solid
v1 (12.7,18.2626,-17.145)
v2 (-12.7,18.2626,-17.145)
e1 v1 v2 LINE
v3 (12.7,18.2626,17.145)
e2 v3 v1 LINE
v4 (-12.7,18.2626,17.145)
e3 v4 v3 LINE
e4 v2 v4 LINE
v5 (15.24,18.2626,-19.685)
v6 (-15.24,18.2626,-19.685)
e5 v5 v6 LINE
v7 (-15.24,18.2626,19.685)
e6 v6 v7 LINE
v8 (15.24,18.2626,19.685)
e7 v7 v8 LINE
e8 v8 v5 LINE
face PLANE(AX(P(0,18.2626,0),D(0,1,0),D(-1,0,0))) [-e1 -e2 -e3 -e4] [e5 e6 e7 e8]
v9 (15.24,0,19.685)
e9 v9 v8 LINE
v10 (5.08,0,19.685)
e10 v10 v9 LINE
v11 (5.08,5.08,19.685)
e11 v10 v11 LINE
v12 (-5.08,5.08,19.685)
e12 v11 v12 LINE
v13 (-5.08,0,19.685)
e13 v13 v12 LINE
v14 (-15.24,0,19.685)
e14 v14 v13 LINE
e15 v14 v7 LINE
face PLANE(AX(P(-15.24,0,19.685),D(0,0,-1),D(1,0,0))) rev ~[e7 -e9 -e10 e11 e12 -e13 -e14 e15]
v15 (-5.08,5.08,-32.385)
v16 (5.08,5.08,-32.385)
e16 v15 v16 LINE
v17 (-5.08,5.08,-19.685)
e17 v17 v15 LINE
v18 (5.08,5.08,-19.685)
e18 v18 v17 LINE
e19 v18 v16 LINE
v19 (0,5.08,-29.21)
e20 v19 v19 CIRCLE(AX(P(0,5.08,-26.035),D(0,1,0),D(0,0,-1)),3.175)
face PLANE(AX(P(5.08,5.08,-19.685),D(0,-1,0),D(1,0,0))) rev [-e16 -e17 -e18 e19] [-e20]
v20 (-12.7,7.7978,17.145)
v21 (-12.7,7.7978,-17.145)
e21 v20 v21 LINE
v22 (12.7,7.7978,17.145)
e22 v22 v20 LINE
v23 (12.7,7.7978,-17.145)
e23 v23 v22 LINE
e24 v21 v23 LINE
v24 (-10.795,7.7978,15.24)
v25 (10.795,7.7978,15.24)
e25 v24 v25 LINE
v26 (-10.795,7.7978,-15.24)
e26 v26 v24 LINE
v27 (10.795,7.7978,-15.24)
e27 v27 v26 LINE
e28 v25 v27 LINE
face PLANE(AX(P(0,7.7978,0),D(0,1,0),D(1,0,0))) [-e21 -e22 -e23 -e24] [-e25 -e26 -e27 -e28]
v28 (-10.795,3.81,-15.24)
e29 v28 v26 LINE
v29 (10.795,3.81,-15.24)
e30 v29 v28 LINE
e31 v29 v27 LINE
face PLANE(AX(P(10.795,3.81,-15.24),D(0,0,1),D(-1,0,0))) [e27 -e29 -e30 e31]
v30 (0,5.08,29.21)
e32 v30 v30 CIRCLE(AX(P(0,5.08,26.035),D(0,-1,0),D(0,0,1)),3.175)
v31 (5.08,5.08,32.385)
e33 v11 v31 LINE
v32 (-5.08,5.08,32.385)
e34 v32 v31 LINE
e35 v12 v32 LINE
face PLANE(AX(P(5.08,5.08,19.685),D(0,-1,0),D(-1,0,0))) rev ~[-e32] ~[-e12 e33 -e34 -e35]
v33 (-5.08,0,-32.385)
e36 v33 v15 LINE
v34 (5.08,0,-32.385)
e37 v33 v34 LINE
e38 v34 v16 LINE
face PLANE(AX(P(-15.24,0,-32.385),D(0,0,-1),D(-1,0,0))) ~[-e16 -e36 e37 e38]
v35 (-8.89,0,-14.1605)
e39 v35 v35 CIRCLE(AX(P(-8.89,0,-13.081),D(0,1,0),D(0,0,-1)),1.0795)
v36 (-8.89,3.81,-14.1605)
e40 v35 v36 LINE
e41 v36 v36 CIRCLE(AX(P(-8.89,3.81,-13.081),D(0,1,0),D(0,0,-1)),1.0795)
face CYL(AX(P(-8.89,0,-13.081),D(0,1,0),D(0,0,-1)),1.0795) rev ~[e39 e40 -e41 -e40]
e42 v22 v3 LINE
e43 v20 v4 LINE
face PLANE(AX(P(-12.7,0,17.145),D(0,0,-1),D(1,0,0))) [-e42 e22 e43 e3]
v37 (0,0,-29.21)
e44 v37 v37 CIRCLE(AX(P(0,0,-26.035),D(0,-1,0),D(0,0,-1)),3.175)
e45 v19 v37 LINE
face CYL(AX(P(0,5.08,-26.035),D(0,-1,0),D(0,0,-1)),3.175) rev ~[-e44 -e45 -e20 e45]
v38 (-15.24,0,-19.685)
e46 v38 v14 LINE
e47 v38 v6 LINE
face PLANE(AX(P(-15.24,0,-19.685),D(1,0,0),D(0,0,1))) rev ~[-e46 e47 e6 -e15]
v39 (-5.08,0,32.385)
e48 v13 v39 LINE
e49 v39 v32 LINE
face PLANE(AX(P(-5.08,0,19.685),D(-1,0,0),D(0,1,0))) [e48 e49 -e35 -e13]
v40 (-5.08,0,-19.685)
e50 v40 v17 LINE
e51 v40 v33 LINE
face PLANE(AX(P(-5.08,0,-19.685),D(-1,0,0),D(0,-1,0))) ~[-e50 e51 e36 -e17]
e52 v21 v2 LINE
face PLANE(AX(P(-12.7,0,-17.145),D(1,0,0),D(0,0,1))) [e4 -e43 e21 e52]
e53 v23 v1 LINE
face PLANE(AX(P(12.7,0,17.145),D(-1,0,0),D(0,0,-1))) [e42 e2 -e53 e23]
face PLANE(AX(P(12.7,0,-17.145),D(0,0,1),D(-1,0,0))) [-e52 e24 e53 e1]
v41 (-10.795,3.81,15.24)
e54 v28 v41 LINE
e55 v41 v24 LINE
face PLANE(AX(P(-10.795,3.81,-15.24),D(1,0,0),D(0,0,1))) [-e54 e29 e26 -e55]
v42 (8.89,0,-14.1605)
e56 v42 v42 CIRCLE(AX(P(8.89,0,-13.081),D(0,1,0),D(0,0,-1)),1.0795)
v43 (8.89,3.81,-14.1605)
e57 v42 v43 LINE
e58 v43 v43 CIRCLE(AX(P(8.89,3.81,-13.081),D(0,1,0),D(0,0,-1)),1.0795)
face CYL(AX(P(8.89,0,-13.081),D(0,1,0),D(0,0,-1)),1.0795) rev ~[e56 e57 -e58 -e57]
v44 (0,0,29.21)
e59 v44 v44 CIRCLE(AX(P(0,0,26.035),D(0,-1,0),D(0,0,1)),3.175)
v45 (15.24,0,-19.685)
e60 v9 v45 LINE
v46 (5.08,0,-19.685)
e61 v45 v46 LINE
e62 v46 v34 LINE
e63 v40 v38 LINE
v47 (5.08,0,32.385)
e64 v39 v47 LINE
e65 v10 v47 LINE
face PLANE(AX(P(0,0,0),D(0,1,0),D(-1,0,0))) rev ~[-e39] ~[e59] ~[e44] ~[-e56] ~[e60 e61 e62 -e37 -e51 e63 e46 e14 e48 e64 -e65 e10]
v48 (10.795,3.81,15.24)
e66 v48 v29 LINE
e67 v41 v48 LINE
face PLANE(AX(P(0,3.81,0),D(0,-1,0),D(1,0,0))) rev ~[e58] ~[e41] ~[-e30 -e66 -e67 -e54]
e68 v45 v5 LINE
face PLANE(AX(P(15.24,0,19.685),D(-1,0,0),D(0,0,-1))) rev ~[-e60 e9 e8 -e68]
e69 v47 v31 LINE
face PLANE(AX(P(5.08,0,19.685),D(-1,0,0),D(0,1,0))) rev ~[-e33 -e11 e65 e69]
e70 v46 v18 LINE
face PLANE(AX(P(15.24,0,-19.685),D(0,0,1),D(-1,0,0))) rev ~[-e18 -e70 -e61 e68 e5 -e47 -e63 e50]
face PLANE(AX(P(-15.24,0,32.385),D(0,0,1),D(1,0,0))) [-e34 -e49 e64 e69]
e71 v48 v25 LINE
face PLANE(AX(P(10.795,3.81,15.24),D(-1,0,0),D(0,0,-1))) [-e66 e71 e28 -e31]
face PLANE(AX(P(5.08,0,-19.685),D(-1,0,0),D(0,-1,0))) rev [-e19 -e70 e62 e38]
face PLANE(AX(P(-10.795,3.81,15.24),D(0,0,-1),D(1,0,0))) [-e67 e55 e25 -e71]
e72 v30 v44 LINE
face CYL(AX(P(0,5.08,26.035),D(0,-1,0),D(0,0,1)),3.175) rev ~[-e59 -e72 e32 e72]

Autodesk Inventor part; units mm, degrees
ref_plane "XZ Plane" through (0, 0, 0) normal (0, 1, 0) x (-1, 0, 0)
sketch "Sketch3" plane through (0, 0, 0) normal (0, 1, 0) x (-1, 0, 0)
  line L0 (15.24, 19.685) -> (-15.24, 19.685)
  line L1 (-15.24, 19.685) -> (-15.24, -19.685)
  line L2 (-15.24, -19.685) -> (15.24, -19.685)
  line L3 (15.24, -19.685) -> (15.24, 19.685)
  line L4 (15.24, 19.685) -> (-15.24, -19.685) construction
  line L5 (-15.24, 19.685) -> (15.24, -19.685) construction
  line L6 (-12.7, 17.145) -> (-12.7, -17.145)
  line L7 (-12.7, -17.145) -> (12.7, -17.145)
  line L8 (12.7, -17.145) -> (12.7, 17.145)
  line L9 (12.7, 17.145) -> (-12.7, 17.145)
  line L10 (-12.7, 17.145) -> (12.7, -17.145) construction
  line L11 (-12.7, -17.145) -> (12.7, 17.145) construction
  point P0 (0, 0)
  dimension "d11" = 30.48
  dimension "d12" = 39.37
  dimension "d13" = 34.29
  dimension "d14" = 25.4
extrude "Extrusion4" add sketch "Sketch3" along normal blind 18.2626
sketch "Sketch4" plane through (0, 0, 0) normal (0, -1, 0) x (1, 0, 0)
  line L0 (12.7, 17.145) -> (-12.7, 17.145) projected
  line L1 (-12.7, -17.145) -> (12.7, -17.145) projected
  line L2 (12.7, 17.145) -> (-12.7, 17.145)
  line L3 (-12.7, 17.145) -> (-12.7, -17.145)
  line L4 (-12.7, -17.145) -> (12.7, -17.145)
  line L5 (12.7, -17.145) -> (12.7, 17.145)
  point P0 (0, 0)
extrude "Extrusion5" add sketch "Sketch4" against normal blind 3.81
sketch "Sketch5" plane through (0, 3.81, 0) normal (0, 1, 0) x (1, 0, 0)
  line L0 (10.795, -15.24) -> (10.795, 15.24)
  line L1 (10.795, 15.24) -> (-10.795, 15.24)
  line L2 (-10.795, 15.24) -> (-10.795, -15.24)
  line L3 (-10.795, -15.24) -> (10.795, -15.24)
  line L4 (10.795, -15.24) -> (-10.795, 15.24) construction
  line L5 (10.795, 15.24) -> (-10.795, -15.24) construction
  line L6 (12.7, -17.145) -> (-12.7, -17.145) projected
  line L7 (12.7, 17.145) -> (12.7, -17.145) projected
  line L8 (-12.7, 17.145) -> (12.7, 17.145) projected
  line L9 (12.7, -17.145) -> (-12.7, -17.145)
  line L10 (-12.7, -17.145) -> (-12.7, 17.145)
  line L11 (-12.7, 17.145) -> (12.7, 17.145)
  line L12 (12.7, 17.145) -> (12.7, -17.145)
  point P0 (0, 0)
  dimension "d21" = 1.905
  dimension "d22" = 1.905
extrude "Extrusion6" add sketch "Sketch5" along normal blind 3.9878
sketch "Sketch6" plane through (0, 0, 0) normal (0, -1, 0) x (1, 0, 0)
  line L0 (15.24, 19.685) -> (15.24, -19.685) construction
  line L1 (15.24, -13.081) -> (-15.24, -13.081) construction
  line L2 (-15.24, -19.685) -> (-15.24, 19.685) construction
  line L3 (15.24, -19.685) -> (-15.24, -19.685) construction
  point P0 (0, 0)
  point P1 (8.89, -13.081)
  point P2 (-8.89, -13.081)
  dimension "d25" = 6.604
  dimension "d26" = 6.35
  dimension "d27" = 6.35
hole "Hole1" at (8.89, 0, -13.081) at (-8.89, 0, -13.081) direction (0, 1, 0) diameter 2.159 end through all
sketch "Sketch8" plane through (-15.24, 0, 19.685) normal (0, 0, 1) x (1, 0, 0)
  line L0 (15.24, 0) -> (20.32, 0)
  line L1 (20.32, 0) -> (20.32, 5.08)
  line L2 (20.32, 5.08) -> (15.24, 5.08)
  line L3 (15.24, 5.08) -> (15.24, 0)
  line L4 (15.24, 0) -> (10.16, 0)
  line L5 (10.16, 0) -> (10.16, 5.08)
  line L6 (10.16, 5.08) -> (15.24, 5.08)
  dimension "d35" = 5.08
  dimension "d36" = 5.08
extrude "Extrusion7" add sketch "Sketch8" along normal blind 12.7
sketch "Sketch10" plane through (-5.08, 5.08, 19.685) normal (0, 1, 0) x (1, 0, 0)
  line L0 (-10.16, 0) -> (20.32, 0) projected
  line L1 (0, 0) -> (0, -12.7) projected
  point P0 (5.08, 19.685)
  point P1 (5.08, -6.35)
  dimension "d46" = 6.35
  dimension "d54" = 5.08
hole "Hole3" at (0, 5.08, 26.035) direction (0, -1, 0) diameter 6.35 end through all
mirror "Mirror1" about plane through (0, 0, 0) normal (0, 0, 1) of "Hole3", "Extrusion7"
equation "\"d11\" = caseWidth"
equation "\"d12\" = caseLength"
equation "\"d13\" = internalCaseLength"
equation "\"d14\" = internalCaseWidth"
equation "\"d17\" = caseHeight"
equation "\"d19\" = caseBaseThickness"
equation "\"d21\" = supportWidth"
equation "\"d22\" = supportWidth"
equation "\"d23\" = componentHeightAboveBoard"
equation "\"d35\" = tabHeight"
equation "\"d36\" = halfTabWidth"
equation "\"d37\" = tabLength"
equation "\"d46\" = halfTabLength"
equation "\"d54\" = halfTabWidth"
equation "\"boardWidth\" = 22.86"
equation "\"boardLength\" = 31.75"
equation "\"boardThickness\" = 1.7272"
equation "\"componentHeightAboveBoard\" = 3.9878"
equation "\"headerHeightAboveBard\" = 8.7376"
equation "\"holeDiam\" = 2.3368"
equation "\"centerLineForHoles\" = 2.794"
equation "\"holeDistanceFromEdge\" = 2.54"
equation "\"supportWidth\" = 1.905"
equation "\"caseWallWidth\" = 2.54"
equation "\"internalSpacingForComponent\" = 1.27"
equation "\"caseWidth\" = 2 * caseWallWidth + boardWidth + 2 * internalSpacingForComponent"
equation "\"caseLength\" = 2 * caseWallWidth + boardLength + 2 * internalSpacingForComponent"
equation "\"internalCaseWidth\" = boardWidth + 2 * internalSpacingForComponent"
equation "\"internalCaseLength\" = boardLength + 2 * internalSpacingForComponent"
equation "\"caseHeight\" = headerHeightAboveBard + boardThickness + componentHeightAboveBoard + caseBaseThickness"
equation "\"caseBaseThickness\" = 3.81"
equation "\"tabHeight\" = 5.08"
equation "\"tabWidth\" = 10.16"
equation "\"halfTabWidth\" = 0.5 * tabWidth"
equation "\"tabLength\" = 12.7"
equation "\"halfTabLength\" = 0.5 * tabLength"
properties part number "CaseForADXL_345" material "ABS Plastic"
